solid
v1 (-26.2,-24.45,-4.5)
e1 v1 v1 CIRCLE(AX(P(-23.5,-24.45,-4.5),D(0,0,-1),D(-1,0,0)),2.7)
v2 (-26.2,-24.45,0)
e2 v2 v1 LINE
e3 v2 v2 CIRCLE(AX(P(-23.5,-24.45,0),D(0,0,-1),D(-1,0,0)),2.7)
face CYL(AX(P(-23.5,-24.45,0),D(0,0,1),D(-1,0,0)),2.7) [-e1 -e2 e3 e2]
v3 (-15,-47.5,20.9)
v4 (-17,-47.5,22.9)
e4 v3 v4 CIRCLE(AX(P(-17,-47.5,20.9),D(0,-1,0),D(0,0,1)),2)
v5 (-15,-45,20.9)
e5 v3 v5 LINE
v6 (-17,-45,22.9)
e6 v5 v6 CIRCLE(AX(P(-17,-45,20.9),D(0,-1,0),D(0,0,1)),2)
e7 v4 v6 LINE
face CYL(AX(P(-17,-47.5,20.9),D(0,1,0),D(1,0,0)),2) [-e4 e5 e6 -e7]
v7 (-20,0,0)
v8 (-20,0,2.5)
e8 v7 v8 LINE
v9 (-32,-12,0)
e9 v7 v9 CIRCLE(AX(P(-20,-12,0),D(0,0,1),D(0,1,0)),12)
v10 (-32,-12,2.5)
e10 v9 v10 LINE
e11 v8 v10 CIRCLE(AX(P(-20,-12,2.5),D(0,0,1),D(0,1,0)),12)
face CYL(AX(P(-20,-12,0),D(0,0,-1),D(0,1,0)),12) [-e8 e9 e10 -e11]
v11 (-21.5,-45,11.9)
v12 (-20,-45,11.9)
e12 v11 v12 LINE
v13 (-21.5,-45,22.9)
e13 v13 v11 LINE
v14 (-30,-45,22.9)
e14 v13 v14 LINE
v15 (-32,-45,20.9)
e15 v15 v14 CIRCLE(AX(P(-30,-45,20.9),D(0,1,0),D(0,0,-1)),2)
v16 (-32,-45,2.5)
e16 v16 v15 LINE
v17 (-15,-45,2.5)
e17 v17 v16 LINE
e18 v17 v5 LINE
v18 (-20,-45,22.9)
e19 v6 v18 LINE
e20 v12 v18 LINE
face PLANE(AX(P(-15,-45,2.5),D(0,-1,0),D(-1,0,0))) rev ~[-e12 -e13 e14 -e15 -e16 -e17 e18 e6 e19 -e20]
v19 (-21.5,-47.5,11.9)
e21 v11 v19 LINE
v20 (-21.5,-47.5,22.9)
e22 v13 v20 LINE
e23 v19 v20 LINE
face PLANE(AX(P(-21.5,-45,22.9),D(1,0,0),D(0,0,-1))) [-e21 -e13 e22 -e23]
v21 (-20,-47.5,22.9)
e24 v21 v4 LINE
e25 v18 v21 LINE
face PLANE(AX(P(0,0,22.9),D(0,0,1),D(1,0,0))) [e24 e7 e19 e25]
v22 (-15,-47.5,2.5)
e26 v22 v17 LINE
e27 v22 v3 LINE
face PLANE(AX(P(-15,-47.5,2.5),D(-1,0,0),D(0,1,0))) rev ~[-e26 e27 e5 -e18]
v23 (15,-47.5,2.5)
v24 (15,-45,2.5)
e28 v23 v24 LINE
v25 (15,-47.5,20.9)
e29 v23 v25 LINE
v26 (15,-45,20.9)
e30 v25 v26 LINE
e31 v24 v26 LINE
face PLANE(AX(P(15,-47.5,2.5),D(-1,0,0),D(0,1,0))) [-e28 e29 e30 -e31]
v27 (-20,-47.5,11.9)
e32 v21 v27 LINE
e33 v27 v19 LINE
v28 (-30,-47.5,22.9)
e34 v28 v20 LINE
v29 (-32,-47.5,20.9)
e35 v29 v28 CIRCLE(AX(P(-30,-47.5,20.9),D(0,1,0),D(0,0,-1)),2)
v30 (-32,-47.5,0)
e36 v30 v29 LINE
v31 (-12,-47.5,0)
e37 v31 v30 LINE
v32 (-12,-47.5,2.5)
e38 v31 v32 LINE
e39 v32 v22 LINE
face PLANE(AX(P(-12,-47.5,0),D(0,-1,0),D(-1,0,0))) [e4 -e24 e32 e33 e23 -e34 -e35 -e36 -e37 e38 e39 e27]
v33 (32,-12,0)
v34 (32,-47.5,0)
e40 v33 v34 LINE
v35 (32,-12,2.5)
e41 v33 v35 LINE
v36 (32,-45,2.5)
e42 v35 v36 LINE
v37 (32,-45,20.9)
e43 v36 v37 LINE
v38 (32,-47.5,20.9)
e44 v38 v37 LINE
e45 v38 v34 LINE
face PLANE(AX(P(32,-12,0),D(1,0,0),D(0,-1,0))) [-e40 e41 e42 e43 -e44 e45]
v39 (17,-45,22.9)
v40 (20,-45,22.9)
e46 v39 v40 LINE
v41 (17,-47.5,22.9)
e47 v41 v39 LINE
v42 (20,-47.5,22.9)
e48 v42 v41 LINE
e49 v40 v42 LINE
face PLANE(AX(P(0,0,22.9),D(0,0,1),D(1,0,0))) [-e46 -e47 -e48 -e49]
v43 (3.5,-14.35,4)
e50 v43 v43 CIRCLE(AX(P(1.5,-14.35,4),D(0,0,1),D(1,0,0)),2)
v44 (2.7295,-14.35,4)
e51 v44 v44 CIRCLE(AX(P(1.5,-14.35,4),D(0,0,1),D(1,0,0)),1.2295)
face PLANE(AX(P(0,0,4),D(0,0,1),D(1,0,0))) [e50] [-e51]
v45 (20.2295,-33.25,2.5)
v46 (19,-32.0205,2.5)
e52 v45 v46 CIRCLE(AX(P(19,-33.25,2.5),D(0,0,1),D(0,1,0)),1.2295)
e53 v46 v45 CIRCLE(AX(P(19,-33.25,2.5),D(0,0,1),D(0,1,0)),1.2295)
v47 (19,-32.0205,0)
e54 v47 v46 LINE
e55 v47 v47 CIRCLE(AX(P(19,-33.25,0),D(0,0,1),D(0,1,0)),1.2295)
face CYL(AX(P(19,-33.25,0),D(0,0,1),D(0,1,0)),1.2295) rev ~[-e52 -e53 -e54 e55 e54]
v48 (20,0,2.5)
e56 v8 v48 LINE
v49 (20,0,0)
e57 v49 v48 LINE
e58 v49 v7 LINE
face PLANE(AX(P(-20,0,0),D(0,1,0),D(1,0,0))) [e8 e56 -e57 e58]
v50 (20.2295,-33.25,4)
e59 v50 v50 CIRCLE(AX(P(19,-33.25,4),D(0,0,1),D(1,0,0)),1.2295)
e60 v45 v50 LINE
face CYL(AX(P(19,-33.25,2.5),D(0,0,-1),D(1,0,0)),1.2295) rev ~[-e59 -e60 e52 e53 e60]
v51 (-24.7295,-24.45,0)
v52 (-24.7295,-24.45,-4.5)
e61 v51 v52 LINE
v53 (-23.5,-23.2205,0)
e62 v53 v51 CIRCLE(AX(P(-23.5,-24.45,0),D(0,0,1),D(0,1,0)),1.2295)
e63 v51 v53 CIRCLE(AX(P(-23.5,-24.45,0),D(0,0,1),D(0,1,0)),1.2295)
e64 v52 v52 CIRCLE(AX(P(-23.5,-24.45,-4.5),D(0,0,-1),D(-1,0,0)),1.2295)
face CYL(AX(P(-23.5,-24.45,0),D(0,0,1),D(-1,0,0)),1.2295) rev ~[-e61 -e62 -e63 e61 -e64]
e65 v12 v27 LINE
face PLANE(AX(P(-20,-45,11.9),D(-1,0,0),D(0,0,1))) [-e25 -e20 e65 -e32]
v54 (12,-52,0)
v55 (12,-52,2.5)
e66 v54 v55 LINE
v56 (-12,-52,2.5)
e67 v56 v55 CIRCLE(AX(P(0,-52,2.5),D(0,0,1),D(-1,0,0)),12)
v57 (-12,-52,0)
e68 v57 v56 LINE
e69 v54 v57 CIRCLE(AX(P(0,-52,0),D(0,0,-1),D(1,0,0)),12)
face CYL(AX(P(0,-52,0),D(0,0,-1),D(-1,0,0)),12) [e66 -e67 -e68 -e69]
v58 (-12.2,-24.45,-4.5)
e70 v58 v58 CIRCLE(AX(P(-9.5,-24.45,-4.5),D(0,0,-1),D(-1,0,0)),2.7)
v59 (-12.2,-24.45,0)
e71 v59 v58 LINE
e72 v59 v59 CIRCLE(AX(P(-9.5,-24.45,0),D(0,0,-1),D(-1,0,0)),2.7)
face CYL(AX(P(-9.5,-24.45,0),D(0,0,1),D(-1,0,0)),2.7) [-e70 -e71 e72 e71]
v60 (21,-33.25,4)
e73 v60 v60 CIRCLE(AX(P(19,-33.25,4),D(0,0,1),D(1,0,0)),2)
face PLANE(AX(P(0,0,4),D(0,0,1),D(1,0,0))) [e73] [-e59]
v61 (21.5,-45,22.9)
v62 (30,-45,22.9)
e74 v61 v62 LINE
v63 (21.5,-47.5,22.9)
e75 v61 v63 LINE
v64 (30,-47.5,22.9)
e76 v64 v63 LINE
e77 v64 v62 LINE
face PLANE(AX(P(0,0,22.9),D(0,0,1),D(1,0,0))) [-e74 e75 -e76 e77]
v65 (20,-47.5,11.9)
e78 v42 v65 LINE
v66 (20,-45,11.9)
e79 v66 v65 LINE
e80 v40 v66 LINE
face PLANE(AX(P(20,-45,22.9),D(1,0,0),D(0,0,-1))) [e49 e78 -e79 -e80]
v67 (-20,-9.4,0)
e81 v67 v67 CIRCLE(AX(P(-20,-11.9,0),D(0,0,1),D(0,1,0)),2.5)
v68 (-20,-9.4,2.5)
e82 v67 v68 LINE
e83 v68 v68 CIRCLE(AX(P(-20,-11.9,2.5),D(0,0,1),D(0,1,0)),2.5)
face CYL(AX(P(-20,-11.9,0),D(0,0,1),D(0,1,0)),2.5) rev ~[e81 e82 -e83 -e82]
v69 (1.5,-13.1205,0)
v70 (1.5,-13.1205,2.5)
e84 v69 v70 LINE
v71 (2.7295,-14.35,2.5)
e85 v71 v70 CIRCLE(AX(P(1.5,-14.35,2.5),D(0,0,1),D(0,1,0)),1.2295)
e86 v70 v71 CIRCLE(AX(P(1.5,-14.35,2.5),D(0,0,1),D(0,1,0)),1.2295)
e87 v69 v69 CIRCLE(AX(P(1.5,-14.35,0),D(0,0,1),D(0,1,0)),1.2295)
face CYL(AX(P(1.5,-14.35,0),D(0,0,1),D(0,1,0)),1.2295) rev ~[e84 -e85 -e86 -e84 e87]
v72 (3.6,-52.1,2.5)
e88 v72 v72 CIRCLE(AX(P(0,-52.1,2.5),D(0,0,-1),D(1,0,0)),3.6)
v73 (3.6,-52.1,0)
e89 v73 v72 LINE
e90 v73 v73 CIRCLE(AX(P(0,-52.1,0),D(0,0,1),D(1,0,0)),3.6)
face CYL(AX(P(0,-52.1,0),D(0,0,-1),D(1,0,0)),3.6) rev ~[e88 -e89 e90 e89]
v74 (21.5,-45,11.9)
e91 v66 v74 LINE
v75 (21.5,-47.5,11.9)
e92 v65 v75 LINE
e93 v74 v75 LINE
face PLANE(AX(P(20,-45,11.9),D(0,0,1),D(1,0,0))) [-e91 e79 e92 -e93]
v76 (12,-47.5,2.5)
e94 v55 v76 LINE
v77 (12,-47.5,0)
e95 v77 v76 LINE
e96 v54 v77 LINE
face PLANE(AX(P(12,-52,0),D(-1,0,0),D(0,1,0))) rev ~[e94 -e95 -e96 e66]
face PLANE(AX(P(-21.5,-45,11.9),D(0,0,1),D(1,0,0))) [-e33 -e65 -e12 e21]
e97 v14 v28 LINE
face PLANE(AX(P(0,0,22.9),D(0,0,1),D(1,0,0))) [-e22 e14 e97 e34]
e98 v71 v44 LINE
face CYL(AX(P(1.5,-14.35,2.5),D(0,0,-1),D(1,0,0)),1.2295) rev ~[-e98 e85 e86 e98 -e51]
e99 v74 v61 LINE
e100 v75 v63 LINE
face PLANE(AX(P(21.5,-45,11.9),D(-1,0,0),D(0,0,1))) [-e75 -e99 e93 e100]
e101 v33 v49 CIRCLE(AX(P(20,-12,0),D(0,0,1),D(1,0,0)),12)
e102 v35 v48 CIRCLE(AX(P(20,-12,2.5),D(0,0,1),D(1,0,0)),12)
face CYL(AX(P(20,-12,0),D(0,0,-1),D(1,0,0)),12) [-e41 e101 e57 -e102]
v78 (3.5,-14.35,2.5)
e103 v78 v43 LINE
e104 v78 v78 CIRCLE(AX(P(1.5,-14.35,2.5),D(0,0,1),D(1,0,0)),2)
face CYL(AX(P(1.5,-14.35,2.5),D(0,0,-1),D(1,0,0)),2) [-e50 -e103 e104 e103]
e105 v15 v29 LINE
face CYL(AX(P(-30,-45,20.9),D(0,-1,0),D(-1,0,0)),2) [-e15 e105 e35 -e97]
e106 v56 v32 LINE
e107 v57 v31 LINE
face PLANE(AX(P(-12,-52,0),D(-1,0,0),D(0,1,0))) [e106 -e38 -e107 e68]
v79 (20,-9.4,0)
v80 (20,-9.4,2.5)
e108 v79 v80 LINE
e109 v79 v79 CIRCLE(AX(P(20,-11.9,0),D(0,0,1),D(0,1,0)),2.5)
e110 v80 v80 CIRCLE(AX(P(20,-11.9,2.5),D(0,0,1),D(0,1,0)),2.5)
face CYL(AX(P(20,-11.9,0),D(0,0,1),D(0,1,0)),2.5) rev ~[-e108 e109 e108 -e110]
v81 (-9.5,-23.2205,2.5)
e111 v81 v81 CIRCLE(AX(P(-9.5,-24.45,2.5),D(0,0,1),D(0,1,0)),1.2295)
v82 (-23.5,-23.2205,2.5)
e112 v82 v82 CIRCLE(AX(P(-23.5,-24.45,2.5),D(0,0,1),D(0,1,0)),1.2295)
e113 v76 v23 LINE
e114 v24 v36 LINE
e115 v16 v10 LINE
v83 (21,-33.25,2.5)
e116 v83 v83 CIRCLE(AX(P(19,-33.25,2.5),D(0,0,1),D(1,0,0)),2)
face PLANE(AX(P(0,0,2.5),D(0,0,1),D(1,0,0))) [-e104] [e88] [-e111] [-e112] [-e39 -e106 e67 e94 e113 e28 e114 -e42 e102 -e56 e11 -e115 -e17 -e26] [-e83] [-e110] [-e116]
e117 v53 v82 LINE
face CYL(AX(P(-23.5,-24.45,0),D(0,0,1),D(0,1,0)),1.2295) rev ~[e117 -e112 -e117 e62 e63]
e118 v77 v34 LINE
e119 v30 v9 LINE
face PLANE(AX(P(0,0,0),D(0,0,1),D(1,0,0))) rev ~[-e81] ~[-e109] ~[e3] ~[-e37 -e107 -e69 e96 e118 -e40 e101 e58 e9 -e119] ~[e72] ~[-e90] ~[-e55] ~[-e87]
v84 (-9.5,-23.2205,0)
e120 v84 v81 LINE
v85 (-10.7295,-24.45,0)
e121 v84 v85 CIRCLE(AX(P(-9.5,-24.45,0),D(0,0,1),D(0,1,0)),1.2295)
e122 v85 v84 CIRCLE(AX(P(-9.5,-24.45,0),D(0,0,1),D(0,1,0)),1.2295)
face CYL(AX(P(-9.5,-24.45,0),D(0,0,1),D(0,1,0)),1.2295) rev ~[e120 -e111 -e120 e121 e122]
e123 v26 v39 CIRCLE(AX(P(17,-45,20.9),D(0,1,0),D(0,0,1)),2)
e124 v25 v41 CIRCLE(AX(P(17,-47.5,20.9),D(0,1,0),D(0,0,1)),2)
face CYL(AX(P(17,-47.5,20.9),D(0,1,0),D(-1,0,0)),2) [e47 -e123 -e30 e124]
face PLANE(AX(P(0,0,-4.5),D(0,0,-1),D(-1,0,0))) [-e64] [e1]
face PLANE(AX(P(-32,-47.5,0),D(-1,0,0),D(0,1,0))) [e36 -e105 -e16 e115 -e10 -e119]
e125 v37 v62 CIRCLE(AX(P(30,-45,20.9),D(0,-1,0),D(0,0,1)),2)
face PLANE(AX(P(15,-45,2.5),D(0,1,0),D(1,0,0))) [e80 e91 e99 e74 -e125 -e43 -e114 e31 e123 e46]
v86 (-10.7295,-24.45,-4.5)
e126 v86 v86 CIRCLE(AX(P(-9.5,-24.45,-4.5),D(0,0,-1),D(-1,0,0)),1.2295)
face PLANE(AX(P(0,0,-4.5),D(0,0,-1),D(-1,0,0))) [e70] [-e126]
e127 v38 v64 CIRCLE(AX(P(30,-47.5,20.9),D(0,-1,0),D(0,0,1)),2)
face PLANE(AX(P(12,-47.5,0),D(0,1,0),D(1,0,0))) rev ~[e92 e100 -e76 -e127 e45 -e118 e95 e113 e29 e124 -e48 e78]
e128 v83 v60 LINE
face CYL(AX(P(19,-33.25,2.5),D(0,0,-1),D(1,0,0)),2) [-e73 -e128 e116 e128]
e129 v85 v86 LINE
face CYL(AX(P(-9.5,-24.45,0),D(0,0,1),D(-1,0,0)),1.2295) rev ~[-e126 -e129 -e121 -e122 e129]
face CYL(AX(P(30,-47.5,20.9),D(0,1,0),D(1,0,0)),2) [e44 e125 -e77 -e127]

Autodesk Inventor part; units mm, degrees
ref_plane "YZ Plane" through (0, 0, 0) normal (1, 0, 0) x (0, 1, 0)
ref_plane "XZ Plane" through (0, 0, 0) normal (0, 1, 0) x (-1, 0, 0)
ref_plane "XY Plane" through (0, 0, 0) normal (0, 0, 1) x (1, 0, 0)
sketch "Sketch1" plane through (0, 0, 0) normal (0, 0, 1) x (1, 0, 0)
  line L0 (-20, 0) -> (20, 0)
  line L1 (32, -12) -> (32, -47.5)
  line L2 (0, -64) -> (0, -64)
  line L3 (-32, -47.5) -> (-32, -12)
  arc A0 (-20, 0) -> (-32, -12) centre (-20, -12) ccw
  arc A1 (32, -12) -> (20, 0) centre (20, -12) ccw
  line L4 (-12, -52) -> (-12, -47.5)
  line L5 (-12, -47.5) -> (-32, -47.5)
  line L6 (12, -52) -> (12, -47.5)
  line L7 (12, -47.5) -> (32, -47.5)
  circle A2 centre (0, -52.1) radius 3.6
  line L8 (0, -80.2794) -> (0, 16.2794) projected
  arc A3 (-12, -52) -> (0, -64) centre (0, -52) ccw
  arc A4 (0, -64) -> (12, -52) centre (0, -52) ccw
  point P0 (0, 0)
  point P1 (0, 0)
  point P2 (0, -64)
  dimension "d0" = 64
  dimension "d1" = 64
  dimension "d2" = 12
  dimension "d3" = 47.5
  dimension "d4" = 47.5
  dimension "d5" = 7.2
  dimension "d6" = 52.1
  dimension "d8" = 12
  dimension "d9" = 12
  dimension "d10" = 12
extrude "Extrusion1" add sketch "Sketch1" along normal blind 2.5 contours L0 L8 A2 A3 L4 L5 L3 A0 | L0 A1 L1 L7 L6 A4 L8 A2
sketch "Sketch2" plane through (0, 0, 2.5) normal (0, 0, 1) x (1, 0, 0)
  line L0 (-32, -47.5) -> (-15, -47.5)
  line L1 (-15, -47.5) -> (-15, -45)
  line L2 (-15, -45) -> (-32, -45)
  line L3 (-32, -45) -> (-32, -47.5)
  line L4 (32, -47.5) -> (32, -12) projected
  line L5 (32, -47.5) -> (15, -47.5)
  line L6 (15, -47.5) -> (15, -45)
  line L7 (15, -45) -> (32, -45)
  line L8 (32, -45) -> (32, -47.5)
  point P0 (0, 0)
  point P1 (-12, -47.5)
  point P2 (12, -47.5)
  point P3 (32, -45)
  point P4 (15, -46.25)
  point P5 (-15, -46.25)
  dimension "d13" = 2.5
  dimension "d17" = 30
  dimension "d18" = 2.5
extrude "Extrusion2" add sketch "Sketch2" along normal blind 20.4
sketch "Sketch3" plane through (15, -45, 2.5) normal (0, 1, 0) x (1, 0, 0)
  line L0 (0, -20.4) -> (17, -20.4) projected
  line L1 (6.5, -20.4) -> (5, -20.4)
  line L2 (5, -20.4) -> (5, -9.4)
  line L3 (5, -9.4) -> (6.5, -9.4)
  line L4 (6.5, -9.4) -> (6.5, -20.4)
  line L5 (-3, 2.5) -> (17, 2.5) projected
  line L6 (-30, -20.4) -> (-47, -20.4) projected
  line L7 (-35, -20.4) -> (-36.5, -20.4)
  line L8 (-36.5, -20.4) -> (-36.5, -9.4)
  line L9 (-36.5, -9.4) -> (-35, -9.4)
  line L10 (-35, -9.4) -> (-35, -20.4)
  line L11 (-47, 2.5) -> (-27, 2.5) projected
  line L12 (0, 0) -> (0, -20.4) projected
  point P0 (-15, 2.5)
  point P1 (5, -14.9)
  point P2 (5, -20.4)
  dimension "d19" = 1.5
  dimension "d20" = 11.9
  dimension "d21" = 1.5
  dimension "d22" = 11.9
  dimension "d23" = 40
  dimension "d24" = 5
extrude "Extrusion3" cut sketch "Sketch3" against normal through all
fillet "Fillet1" radius 2 4 edges at (32, -46.25, 22.9) (15, -46.25, 22.9) (-15, -46.25, 22.9) (-32, -46.25, 22.9)
sketch "Sketch4" plane through (0, 0, 0) normal (0, 0, -1) x (-1, 0, 0)
  line L0 (-20, 0) -> (20, 0) projected
  line L1 (-32, -47.5) -> (-32, -12) projected
  line L2 (0, -76.8) -> (0, 12.8) projected
  point P0 (0, 0)
  point P1 (-20, -11.9)
  point P2 (20, -11.9)
  dimension "d28" = 11.9
  dimension "d30" = 20
  dimension "d31" = 20
hole "Hole1" at (20, -11.9, 0) at (-20, -11.9, 0) direction (0, 0, 1) diameter 5 end through all
sketch "Sketch5" plane through (0, 0, 0) normal (0, 0, -1) x (-1, 0, 0)
  line L0 (0, -76.8) -> (0, 12.8) projected
  line L1 (-20, 0) -> (20, 0) projected
  point P0 (0, 0)
  point P1 (-19, -33.25)
  point P2 (-1.5, -14.35)
  dimension "d39" = 19
  dimension "d40" = 33.25
  dimension "d41" = 1.5
  dimension "d42" = 14.35
hole "Hole2" at (19, -33.25, 0) at (1.5, -14.35, 0) direction (0, 0, 1) diameter 2.459 end through all thread size "M3x0.5" class "6H" standard "ISO Metric profile"
sketch "Sketch6" plane through (0, 0, 0) normal (0, 0, -1) x (-1, 0, 0)
  line L0 (-20, 0) -> (20, 0) projected
  line L1 (0, -76.8) -> (0, 12.8) projected
  point P0 (0, 0)
  point P1 (9.5, -24.45)
  point P2 (23.5, -24.45)
  dimension "d50" = 24.45
  dimension "d51" = 9.5
  dimension "d52" = 23.5
hole "Hole3" at (-9.5, -24.45, 0) at (-23.5, -24.45, 0) direction (0, 0, 1) diameter 2.459 end through all thread size "M3x0.5" class "6H" standard "ISO Metric profile"
sketch "Sketch7" plane through (0, 0, 0) normal (0, 0, -1) x (-1, 0, 0)
  circle A0 centre (9.5, -24.45) radius 1.2295 projected
  circle A1 centre (9.5, -24.45) radius 2.7
  circle A2 centre (23.5, -24.45) radius 1.2295 projected
  circle A3 centre (23.5, -24.45) radius 2.7
  point P0 (0, 0)
  dimension "d60" = 5.4
  dimension "d61" = 5.4
extrude "Extrusion4" add sketch "Sketch7" along normal blind 4.5
sketch "Sketch8" plane through (0, 0, 2.5) normal (0, 0, 1) x (1, 0, 0)
  circle A0 centre (1.5, -14.35) radius 1.2295 projected
  circle A1 centre (1.5, -14.35) radius 2
  circle A2 centre (19, -33.25) radius 1.2295 projected
  circle A3 centre (19, -33.25) radius 2
  point P0 (0, 0)
  dimension "d64" = 4
  dimension "d65" = 4
extrude "Extrusion5" add sketch "Sketch8" along normal blind 1.5
properties part number "Extruder Plate" material "Aluminum 6061"
